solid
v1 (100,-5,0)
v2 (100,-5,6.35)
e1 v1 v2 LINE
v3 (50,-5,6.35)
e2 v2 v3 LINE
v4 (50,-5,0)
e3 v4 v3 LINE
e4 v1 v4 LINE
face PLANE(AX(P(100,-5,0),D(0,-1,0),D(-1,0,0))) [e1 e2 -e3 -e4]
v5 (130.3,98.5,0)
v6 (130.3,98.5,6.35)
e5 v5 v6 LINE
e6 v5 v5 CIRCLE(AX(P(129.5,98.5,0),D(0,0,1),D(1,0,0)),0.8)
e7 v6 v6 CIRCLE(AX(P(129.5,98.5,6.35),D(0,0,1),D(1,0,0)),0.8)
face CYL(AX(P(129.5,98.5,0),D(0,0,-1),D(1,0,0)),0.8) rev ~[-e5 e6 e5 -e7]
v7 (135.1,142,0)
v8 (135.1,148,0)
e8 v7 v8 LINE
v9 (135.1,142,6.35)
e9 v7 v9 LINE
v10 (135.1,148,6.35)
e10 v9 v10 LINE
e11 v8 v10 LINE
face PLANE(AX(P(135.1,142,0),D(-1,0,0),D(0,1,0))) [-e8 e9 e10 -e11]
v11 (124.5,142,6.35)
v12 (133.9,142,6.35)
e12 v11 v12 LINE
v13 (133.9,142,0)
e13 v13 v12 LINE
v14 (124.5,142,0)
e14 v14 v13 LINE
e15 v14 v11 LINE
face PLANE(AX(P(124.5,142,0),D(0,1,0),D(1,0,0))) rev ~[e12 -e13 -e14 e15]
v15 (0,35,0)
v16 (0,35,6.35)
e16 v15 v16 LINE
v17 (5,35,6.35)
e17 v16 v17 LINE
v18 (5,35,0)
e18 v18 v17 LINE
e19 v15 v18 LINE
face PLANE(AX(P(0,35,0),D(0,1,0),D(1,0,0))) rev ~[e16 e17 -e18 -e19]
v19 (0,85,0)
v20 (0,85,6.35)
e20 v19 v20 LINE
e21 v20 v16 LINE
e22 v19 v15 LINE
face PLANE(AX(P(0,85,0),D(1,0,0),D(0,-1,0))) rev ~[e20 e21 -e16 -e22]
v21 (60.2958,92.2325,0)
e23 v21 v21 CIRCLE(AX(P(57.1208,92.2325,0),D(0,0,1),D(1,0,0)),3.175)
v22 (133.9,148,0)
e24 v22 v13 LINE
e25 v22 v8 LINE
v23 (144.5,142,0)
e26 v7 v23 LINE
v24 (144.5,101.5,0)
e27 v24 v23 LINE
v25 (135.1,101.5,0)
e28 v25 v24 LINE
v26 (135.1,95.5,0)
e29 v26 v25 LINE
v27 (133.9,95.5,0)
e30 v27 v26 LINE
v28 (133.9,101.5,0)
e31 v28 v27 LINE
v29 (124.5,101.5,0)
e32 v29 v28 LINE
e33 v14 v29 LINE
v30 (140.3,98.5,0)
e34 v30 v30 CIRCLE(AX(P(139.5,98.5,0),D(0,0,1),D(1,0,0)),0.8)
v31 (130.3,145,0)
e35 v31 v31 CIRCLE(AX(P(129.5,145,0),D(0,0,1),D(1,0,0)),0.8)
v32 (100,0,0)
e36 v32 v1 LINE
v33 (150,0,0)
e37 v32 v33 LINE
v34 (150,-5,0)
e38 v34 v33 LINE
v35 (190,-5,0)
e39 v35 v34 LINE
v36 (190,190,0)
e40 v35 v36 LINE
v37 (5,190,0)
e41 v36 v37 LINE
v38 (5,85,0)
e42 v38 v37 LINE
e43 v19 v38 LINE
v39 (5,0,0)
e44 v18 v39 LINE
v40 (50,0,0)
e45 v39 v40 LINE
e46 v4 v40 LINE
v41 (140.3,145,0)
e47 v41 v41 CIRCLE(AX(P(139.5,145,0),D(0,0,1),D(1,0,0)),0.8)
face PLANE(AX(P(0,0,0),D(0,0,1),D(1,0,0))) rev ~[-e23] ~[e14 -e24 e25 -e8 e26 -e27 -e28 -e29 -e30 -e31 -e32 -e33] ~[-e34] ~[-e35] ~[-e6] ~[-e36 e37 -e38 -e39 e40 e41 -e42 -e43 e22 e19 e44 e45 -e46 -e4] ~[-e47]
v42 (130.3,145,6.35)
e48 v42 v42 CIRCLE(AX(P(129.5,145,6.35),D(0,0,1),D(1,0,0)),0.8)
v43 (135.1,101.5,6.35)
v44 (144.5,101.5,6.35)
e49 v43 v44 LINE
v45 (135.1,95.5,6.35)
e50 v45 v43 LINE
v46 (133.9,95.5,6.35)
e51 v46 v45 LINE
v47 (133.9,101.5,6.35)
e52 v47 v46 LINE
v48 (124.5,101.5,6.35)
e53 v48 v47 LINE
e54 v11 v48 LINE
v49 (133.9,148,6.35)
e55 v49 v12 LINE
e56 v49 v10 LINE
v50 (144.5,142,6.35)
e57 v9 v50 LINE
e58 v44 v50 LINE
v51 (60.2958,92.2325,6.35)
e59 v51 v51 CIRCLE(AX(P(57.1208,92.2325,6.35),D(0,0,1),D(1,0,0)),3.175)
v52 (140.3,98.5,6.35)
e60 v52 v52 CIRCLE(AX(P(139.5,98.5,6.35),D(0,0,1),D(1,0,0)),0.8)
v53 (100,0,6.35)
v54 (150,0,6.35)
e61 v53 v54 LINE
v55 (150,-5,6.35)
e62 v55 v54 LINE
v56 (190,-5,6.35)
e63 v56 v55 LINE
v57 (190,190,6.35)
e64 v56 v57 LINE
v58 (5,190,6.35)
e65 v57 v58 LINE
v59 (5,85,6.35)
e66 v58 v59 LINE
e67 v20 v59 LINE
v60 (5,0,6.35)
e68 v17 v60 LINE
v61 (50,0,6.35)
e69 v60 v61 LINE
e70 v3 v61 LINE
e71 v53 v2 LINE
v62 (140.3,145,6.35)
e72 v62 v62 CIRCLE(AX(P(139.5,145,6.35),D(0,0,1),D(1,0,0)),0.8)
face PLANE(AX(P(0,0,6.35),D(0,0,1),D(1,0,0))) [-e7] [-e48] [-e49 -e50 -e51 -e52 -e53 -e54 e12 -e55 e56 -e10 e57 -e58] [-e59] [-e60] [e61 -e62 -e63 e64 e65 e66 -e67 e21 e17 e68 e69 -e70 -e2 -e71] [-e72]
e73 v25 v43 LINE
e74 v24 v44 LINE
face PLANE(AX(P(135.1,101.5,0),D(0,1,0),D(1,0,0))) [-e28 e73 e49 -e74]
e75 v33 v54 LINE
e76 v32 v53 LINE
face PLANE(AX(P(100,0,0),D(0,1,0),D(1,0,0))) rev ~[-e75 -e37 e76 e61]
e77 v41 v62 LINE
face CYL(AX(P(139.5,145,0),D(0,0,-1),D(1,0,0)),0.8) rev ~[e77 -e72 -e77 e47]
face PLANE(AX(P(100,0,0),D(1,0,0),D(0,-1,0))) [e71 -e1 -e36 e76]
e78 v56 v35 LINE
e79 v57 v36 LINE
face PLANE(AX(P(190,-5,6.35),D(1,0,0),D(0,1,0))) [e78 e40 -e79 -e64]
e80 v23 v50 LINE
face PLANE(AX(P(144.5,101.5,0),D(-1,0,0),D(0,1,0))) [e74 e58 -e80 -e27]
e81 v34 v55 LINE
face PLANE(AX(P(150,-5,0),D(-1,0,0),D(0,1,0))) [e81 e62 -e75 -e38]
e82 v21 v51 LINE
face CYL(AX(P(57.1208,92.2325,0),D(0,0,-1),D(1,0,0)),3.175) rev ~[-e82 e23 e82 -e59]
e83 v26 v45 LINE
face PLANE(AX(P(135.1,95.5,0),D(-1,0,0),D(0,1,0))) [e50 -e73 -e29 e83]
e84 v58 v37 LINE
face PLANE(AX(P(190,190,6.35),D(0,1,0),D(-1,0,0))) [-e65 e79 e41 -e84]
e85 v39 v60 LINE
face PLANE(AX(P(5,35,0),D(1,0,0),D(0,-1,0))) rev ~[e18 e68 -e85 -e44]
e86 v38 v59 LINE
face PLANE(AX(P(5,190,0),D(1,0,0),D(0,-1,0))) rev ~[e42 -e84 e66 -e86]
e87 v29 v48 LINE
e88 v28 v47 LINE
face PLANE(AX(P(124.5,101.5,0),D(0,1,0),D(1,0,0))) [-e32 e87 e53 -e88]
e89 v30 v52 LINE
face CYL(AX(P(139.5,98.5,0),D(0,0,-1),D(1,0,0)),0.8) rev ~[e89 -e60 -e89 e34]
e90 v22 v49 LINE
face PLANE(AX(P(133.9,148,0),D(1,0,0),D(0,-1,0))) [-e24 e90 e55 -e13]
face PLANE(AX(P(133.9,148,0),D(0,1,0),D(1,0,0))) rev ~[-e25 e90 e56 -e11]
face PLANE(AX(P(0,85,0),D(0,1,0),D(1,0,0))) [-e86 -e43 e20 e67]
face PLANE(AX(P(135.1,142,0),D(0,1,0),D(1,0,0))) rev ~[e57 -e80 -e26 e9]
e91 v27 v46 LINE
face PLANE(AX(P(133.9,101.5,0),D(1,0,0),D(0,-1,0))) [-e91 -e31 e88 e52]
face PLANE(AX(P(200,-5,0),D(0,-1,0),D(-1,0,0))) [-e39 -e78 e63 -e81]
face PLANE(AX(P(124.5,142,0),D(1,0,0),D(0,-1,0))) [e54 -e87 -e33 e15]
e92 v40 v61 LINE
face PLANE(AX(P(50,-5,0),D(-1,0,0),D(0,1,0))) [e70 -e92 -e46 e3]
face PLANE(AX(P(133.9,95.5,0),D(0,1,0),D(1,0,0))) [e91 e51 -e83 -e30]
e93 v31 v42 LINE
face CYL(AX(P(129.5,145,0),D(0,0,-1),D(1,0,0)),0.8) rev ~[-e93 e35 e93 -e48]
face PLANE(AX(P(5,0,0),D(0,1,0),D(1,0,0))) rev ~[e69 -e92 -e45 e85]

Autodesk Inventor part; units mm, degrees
ref_plane "YZ Plane" through (0, 0, 0) normal (1, 0, 0) x (0, 1, 0)
ref_plane "XZ Plane" through (0, 0, 0) normal (0, 1, 0) x (-1, 0, 0)
ref_plane "XY Plane" through (0, 0, 0) normal (0, 0, 1) x (1, 0, 0)
sketch "Block1" plane through (0, 0, 0) normal (0, 0, 1) x (1, 0, 0)
  circle A0 centre (-65.4812, 52.5391) radius 2.75 construction
  circle A1 centre (-65.4812, 52.5391) radius 5 construction
  line L0 (-55.4812, 62.5391) -> (-95.9812, 62.5391)
  line L1 (-95.9812, 62.5391) -> (-95.9812, 42.5391)
  arc A2 (-100.7311, 56.2391) -> (-100.7311, 58.8391) centre (-98.9812, 57.5391) ccw
  arc A3 (-100.7311, 46.2391) -> (-100.7311, 48.8391) centre (-98.9812, 47.5391) ccw
  line L2 (-95.9812, 42.5391) -> (-55.4812, 42.5391)
  arc A4 (-50.7312, 48.8391) -> (-50.7312, 46.2391) centre (-52.4812, 47.5391) ccw
  arc A5 (-50.7312, 58.8391) -> (-50.7312, 56.2391) centre (-52.4812, 57.5391) ccw
  line L3 (-55.4812, 62.5391) -> (-55.4812, 42.5391)
  point P0 (-74.5923, 52.5391)
sketch "open sketch to change param" plane through (0, 0, 0) normal (0, 0, 1) x (1, 0, 0)
  line L0 (0, 0) -> (450, 0)
  line L1 (450, 0) -> (450, 500)
  line L2 (0, 500) -> (0, 0)
  line L3 (225, 500) -> (225, 0) construction
  line L4 (0, 455) -> (5, 455)
  line L5 (5, 455) -> (5, 405)
  line L6 (5, 405) -> (0, 405)
  line L7 (0, 405) -> (0, 455)
  line L8 (450, 405) -> (450, 455)
  line L9 (100, 500) -> (100, 505)
  line L10 (100, 505) -> (50, 505)
  line L11 (50, 505) -> (50, 500)
  line L12 (50, 500) -> (0, 500)
  line L13 (200, 500) -> (200, 505)
  line L14 (200, 505) -> (150, 505)
  line L15 (150, 505) -> (150, 500)
  line L16 (300, 500) -> (300, 505)
  line L17 (300, 505) -> (250, 505)
  line L18 (250, 505) -> (250, 500)
  line L19 (400, 500) -> (400, 505)
  line L20 (400, 505) -> (350, 505)
  line L21 (350, 505) -> (350, 500)
  line L22 (150, 500) -> (100, 500)
  line L23 (250, 500) -> (200, 500)
  line L24 (450, 500) -> (400, 500)
  line L25 (350, 500) -> (300, 500)
  line L26 (5, 500) -> (5, 0)
  line L27 (445, 500) -> (445, 0)
  line L28 (0, 85) -> (5, 85)
  line L29 (0, 35) -> (5, 35)
  line L30 (450, 455) -> (445, 455)
  line L31 (445, 405) -> (450, 405)
  line L32 (450, 85) -> (445, 85)
  line L33 (450, 35) -> (445, 35)
  line L34 (0, 250) -> (445, 250)
  line L35 (100, 0) -> (100, -5)
  line L36 (100, -5) -> (50, -5)
  line L37 (50, -5) -> (50, 0)
  line L38 (200, 0) -> (200, -5)
  line L39 (200, -5) -> (150, -5)
  line L40 (150, -5) -> (150, 0)
  line L41 (300, 0) -> (300, -5)
  line L42 (300, -5) -> (250, -5)
  line L43 (250, -5) -> (250, 0)
  line L44 (400, 0) -> (400, -5)
  line L45 (400, -5) -> (350, -5)
  line L46 (350, -5) -> (350, 0)
  circle A0 centre (134.5, 132) radius 3.175
  line L47 (134.5, 132) -> (201.9264, 140.8134) construction
  line L48 (201.9264, 140.8134) -> (126.9265, 140.7316) construction
  line L49 (126.9265, 140.7316) -> (57.1208, 92.2325) construction
  line L50 (134.5, 132) -> (57.1208, 92.2325) construction
  line L51 (134.5, 132) -> (5, 132) construction
  circle A1 centre (57.1208, 92.2325) radius 3.175
  circle A2 centre (139.5, 145) radius 2.18
  circle A3 centre (129.5, 145) radius 2.18
  circle A4 centre (139.5, 98.5) radius 2.18
  circle A5 centre (129.5, 98.5) radius 2.18
  line L52 (201.9264, 140.8134) -> (-23.205, 247.8943) construction
  line L53 (133.9, 148) -> (133.9, 142)
  line L54 (133.9, 148) -> (135.1, 148)
  line L55 (135.1, 142) -> (135.1, 148)
  line L56 (133.9, 142) -> (135.1, 142)
  line L57 (135.1, 101.5) -> (133.9, 101.5)
  line L58 (133.9, 101.5) -> (133.9, 95.5)
  line L59 (133.9, 95.5) -> (135.1, 95.5)
  line L60 (135.1, 95.5) -> (135.1, 101.5)
  circle A6 centre (129.5, 145) radius 0.8
  circle A7 centre (139.5, 145) radius 0.8
  circle A8 centre (129.5, 98.5) radius 0.8
  circle A9 centre (139.5, 98.5) radius 0.8
  line L61 (0, 0) -> (0, 240)
  line L62 (0, 240) -> (-152.4, 240)
  line L63 (5, 0) -> (190, 0)
  line L64 (190, 0) -> (190, 190)
  line L65 (190, 190) -> (5, 190)
  line L66 (5, 190) -> (5, 0)
  circle A10 centre (134.5, 132) radius 2.75 construction
  circle A11 centre (134.5, 132) radius 5 construction
  line L67 (124.5, 142) -> (124.5, 101.5)
  line L68 (124.5, 101.5) -> (144.5, 101.5)
  arc A12 (130.8, 96.75) -> (128.2, 96.75) centre (129.5, 98.5) ccw
  arc A13 (140.8, 96.75) -> (138.2, 96.75) centre (139.5, 98.5) ccw
  line L69 (144.5, 101.5) -> (144.5, 142)
  arc A14 (138.2, 146.75) -> (140.8, 146.75) centre (139.5, 145) ccw
  arc A15 (128.2, 146.75) -> (130.8, 146.75) centre (129.5, 145) ccw
  line L70 (124.5, 142) -> (144.5, 142)
  point P0 (225, 240)
  point P1 (5, 480)
  point P2 (0, 455)
  point P3 (0, 405)
  point P4 (5, 405)
  point P5 (450, 35)
  point P6 (450, 85)
  point P7 (445, 85)
  point P8 (445, 405)
  point P9 (450, 405)
  point P10 (445, 35)
  point P11 (100, 0)
  point P12 (50, 0)
  point P13 (200, 0)
  point P14 (150, 0)
  point P15 (300, 0)
  point P16 (250, 0)
  point P17 (400, 0)
  point P18 (350, 0)
  point P19 (138.2, 146.75)
  point P20 (140.8, 146.75)
  point P21 (128.2, 146.75)
  point P22 (130.8, 146.75)
  point P23 (140.8, 96.75)
  point P24 (138.2, 96.75)
  point P25 (130.8, 96.75)
  point P26 (128.2, 96.75)
  point P27 (134.5, 142)
  point P28 (134.5, 142)
  point P29 (134.5, 101.5)
  point P30 (134.5, 101.5)
  point P31 (135.1, 101.5)
  point P32 (133.9, 101.5)
  dimension "d4" = 240
  dimension "d5" = 50
  dimension "d6" = 5
  dimension "d17" = 50
  dimension "d18" = 50
  dimension "d28" = 100
  dimension "d33" = 500
  dimension "d34" = 5
  dimension "d35" = 45
  dimension "d83" = 50
  dimension "d84" = 35
  dimension "d100" = 450
  dimension "d101" = 6.35
  dimension "d102" = 310.5
  dimension "d103" = 132
  dimension "d104" = -27.2
  dimension "d105" = 87
  dimension "d106" = 68
  dimension "d107" = 75
  dimension "d108" = 85
  dimension "d111" = 6.35
  dimension "d122" = 249.3
  dimension "d123" = 25.5
  dimension "d125" = 6
  dimension "d127" = 1.2
  dimension "d128" = 6
  dimension "d129" = 1.2
  dimension "d130" = 1.6
  dimension "d131" = 1.6
  dimension "d132" = 1.6
  dimension "d133" = 1.6
  dimension "d134" = 240
  dimension "d135" = 152.4
  dimension "d136" = 185
  dimension "d137" = 190
extrude "Extrusion1" add sketch "open sketch to change param" along normal blind 6.35 contours L26 L65 L64 L0 | L2 L28 L26 L29 | L0 L35 L36 L37 | L0 L38 L39 L40 | L26 L34 L27 L0 L64 L65 | L26 L5 L12 L11 L10 L9 L22 L15 L14 L13 L23 L18 L17 L16 L25 L21 L20 L19 L24 L27 L34 | L2 L4 L5 L6 | L0 L41 L42 L43 | L27 L30 L1 L31 | L32 L1 L33 L27 | L0 L44 L45 L46 | A2 | A3 | A4 | A5
sketch "Sketch2" plane through (0, 0, 6.35) normal (0, 0, 1) x (1, 0, 0)
  line L0 (0, 0) -> (0, -5)
  line L1 (0, -5) -> (190, -5)
  line L2 (190, -5) -> (190, 190)
  line L3 (190, 190) -> (0, 190)
  line L4 (0, 190) -> (0, -5)
  line L5 (0, 190) -> (0, 568.7197)
  line L6 (5, 405) -> (5, 85) projected
  line L7 (0, 568.7197) -> (531.5547, 568.7197)
  line L8 (531.5547, 568.7197) -> (531.5547, -5)
  line L9 (531.5547, -5) -> (190, -5)
  dimension "d138" = 5
  dimension "d139" = 190
  dimension "d140" = 195
extrude "Extrusion3" cut sketch "Sketch2" against normal blind 6.35 contours L5 L7 L8 L9 L2 L3
properties part number "Cut Pegboard Panel Skiba" material "Wood (Birch)"
